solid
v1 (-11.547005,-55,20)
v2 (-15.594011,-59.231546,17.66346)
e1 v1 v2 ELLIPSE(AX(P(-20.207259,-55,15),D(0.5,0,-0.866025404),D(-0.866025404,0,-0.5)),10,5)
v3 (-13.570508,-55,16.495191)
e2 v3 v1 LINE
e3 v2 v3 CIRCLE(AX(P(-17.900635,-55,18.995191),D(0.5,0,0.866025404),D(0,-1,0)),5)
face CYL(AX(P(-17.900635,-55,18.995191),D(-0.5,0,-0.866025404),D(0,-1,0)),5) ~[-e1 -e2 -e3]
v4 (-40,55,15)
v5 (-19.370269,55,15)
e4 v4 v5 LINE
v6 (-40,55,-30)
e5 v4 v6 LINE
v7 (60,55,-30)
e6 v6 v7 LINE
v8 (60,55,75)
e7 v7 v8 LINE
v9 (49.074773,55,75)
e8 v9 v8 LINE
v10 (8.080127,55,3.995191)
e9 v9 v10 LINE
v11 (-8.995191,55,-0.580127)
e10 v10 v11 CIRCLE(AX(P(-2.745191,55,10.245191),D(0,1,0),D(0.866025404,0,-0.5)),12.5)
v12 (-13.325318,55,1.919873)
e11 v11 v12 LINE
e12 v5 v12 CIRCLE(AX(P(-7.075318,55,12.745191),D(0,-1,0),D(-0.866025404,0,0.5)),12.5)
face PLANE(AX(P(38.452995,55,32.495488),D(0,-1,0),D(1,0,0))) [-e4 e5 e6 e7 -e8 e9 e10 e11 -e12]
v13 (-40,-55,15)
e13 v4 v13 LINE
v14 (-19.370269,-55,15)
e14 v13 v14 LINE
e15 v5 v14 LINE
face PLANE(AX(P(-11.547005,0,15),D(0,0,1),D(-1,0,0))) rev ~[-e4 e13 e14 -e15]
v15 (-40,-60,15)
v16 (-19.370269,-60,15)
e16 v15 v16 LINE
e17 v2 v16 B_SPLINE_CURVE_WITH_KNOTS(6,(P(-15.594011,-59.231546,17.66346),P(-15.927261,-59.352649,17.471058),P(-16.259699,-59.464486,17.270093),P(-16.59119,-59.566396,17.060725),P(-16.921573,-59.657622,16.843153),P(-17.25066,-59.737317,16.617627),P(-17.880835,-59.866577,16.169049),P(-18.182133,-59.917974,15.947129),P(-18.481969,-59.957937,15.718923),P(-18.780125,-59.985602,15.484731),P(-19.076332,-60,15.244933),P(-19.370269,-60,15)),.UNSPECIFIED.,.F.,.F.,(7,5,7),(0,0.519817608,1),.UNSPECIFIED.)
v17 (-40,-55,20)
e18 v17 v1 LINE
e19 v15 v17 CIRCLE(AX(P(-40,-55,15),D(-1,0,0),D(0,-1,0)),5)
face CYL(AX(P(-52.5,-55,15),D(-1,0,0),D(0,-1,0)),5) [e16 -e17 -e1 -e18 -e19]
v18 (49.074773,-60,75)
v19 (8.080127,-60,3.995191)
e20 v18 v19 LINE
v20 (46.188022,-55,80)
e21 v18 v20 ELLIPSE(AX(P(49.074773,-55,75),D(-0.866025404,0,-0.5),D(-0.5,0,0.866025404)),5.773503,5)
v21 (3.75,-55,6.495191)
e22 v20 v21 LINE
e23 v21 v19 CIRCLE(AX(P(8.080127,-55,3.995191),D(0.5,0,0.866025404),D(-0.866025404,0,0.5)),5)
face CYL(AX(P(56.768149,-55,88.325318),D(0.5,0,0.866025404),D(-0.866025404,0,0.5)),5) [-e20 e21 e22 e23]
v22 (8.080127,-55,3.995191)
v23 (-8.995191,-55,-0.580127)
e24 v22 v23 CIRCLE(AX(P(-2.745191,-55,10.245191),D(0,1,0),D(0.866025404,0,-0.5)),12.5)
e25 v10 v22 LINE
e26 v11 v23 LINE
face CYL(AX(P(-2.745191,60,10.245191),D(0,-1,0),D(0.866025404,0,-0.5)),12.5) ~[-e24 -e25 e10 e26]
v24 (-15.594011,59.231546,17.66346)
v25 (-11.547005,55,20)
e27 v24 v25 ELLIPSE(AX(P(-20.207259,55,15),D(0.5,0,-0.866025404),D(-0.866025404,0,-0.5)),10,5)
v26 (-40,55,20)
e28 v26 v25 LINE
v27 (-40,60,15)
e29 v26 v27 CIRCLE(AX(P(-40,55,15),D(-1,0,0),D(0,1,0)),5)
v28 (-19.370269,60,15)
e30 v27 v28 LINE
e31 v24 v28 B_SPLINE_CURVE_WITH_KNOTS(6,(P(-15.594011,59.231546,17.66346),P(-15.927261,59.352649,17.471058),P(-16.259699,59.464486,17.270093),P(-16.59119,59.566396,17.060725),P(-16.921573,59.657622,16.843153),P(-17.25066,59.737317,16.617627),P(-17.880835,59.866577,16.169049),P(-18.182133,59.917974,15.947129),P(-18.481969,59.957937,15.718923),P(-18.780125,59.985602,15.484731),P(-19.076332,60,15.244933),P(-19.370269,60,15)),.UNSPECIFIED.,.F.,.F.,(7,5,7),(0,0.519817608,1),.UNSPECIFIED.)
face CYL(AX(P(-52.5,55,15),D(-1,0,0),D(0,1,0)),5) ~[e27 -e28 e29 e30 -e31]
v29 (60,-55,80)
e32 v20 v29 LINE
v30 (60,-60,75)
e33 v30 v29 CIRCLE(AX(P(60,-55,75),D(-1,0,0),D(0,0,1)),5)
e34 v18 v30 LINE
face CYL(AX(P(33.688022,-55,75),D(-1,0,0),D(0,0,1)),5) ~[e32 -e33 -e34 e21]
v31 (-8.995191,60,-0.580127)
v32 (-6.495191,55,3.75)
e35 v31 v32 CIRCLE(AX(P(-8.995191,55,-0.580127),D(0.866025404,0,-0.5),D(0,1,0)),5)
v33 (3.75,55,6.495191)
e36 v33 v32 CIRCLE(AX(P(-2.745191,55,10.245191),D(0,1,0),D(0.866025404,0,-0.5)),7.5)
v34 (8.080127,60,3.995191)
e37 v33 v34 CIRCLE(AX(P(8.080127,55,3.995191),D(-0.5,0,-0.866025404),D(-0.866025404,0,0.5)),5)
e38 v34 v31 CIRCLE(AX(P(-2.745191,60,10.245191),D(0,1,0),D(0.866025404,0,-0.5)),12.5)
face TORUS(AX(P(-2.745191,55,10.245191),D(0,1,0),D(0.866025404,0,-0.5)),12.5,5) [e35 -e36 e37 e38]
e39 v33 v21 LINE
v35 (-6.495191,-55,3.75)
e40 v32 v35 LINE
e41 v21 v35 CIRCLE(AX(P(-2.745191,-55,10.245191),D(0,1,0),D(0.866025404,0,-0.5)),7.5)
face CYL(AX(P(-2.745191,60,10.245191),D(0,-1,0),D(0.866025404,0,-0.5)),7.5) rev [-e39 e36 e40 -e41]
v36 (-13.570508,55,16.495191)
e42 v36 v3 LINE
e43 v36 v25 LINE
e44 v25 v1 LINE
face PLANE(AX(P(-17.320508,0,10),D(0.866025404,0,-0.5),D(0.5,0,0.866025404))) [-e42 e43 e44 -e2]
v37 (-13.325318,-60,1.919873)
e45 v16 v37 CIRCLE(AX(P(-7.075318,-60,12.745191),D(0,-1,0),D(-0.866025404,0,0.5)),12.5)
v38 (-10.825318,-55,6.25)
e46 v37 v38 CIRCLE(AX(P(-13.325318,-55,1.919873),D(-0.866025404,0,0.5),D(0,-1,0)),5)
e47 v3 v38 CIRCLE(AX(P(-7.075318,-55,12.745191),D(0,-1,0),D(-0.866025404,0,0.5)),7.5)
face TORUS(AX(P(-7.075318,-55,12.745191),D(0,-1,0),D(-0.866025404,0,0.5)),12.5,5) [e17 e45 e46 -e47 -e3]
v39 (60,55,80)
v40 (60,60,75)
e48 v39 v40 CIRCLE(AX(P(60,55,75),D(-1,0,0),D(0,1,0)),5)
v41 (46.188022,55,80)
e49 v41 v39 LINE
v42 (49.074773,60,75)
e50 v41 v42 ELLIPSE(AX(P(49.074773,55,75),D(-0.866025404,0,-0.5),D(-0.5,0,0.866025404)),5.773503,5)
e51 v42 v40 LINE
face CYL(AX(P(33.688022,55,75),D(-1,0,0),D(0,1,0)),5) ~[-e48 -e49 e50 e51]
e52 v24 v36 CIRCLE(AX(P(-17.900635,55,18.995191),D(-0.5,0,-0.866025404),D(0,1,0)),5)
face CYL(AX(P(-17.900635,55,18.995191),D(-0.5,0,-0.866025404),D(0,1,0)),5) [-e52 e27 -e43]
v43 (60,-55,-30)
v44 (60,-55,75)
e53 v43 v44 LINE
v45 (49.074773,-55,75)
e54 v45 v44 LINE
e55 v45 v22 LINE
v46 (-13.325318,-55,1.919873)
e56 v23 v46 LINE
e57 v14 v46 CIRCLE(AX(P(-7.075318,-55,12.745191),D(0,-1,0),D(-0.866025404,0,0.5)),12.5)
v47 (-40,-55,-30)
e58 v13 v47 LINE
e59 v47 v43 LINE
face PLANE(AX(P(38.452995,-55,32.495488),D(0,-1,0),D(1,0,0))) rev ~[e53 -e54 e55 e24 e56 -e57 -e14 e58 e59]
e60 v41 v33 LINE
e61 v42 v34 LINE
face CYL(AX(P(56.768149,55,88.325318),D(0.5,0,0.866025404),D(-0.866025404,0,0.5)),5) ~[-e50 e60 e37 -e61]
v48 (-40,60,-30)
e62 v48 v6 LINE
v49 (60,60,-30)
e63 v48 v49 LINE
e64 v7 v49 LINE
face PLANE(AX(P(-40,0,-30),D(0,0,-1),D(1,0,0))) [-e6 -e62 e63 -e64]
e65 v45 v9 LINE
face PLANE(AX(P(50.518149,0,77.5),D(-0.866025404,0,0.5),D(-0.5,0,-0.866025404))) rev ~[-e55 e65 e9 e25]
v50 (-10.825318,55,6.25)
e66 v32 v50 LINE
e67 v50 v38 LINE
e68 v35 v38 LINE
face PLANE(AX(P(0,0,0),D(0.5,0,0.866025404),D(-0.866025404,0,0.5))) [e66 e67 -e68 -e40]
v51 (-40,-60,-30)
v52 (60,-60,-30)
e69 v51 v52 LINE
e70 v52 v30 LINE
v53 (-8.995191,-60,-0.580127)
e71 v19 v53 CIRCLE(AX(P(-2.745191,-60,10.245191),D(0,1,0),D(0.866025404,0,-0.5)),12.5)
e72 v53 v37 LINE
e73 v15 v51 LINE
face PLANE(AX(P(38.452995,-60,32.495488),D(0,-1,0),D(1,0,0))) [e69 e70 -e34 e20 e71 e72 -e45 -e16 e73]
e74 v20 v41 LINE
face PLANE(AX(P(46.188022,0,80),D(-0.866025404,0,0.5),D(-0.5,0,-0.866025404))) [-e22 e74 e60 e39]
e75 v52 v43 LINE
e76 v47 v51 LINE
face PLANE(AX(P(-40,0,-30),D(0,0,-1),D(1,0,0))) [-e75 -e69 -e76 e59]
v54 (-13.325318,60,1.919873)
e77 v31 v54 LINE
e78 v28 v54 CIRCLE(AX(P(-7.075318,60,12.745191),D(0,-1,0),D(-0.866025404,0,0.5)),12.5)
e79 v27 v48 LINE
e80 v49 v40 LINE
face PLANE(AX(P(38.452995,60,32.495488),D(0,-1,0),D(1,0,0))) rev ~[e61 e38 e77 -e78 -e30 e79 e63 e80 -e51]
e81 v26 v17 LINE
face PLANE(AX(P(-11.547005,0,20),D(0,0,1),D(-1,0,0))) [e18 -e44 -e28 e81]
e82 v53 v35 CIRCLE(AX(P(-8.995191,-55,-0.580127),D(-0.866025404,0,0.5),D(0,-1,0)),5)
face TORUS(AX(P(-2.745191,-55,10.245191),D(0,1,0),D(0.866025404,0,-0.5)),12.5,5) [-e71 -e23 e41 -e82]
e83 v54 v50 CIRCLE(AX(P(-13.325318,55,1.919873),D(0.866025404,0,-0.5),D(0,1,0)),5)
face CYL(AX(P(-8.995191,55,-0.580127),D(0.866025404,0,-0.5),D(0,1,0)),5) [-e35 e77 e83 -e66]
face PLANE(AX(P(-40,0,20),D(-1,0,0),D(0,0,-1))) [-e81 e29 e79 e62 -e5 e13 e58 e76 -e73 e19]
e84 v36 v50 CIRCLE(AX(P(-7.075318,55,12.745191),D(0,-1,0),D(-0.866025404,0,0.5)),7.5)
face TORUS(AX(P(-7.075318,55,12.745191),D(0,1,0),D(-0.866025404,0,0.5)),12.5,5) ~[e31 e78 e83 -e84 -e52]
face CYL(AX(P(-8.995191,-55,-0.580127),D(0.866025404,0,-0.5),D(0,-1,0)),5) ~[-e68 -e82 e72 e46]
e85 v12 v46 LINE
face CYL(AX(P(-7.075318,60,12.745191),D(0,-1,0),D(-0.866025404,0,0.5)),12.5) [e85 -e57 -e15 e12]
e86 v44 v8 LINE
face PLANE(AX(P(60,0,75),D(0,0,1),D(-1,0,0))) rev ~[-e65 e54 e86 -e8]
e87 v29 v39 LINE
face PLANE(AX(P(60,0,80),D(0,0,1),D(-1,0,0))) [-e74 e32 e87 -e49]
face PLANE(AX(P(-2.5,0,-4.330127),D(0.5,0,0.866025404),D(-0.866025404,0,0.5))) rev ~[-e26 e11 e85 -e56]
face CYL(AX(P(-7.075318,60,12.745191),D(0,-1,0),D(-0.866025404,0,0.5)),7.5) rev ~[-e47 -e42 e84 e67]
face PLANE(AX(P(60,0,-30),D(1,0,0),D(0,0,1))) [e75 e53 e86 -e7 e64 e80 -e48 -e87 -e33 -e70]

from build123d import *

# Parameters (mm, degrees)
F0_W         = 60
F0_H         = 30
F1_DEPTH     = 60
F2_R         = 7.5
F3_T1_DEPTH  = 38.8119784648
F3_T3_DEPTH  = 97.3760430703
F3_T5_DEPTH  = 5
F3_T7_DEPTH  = 16.5470053838
F3_T9_DEPTH  = 53.4529946162
F3_T12_ANGLE = 90
F3_T14_ANGLE = 90
F3_T16_ANGLE = 90
F3_T18_ANGLE = 90
F4_T         = 5


# Not quite as in the source:
# - a fillet or chamfer that OpenCascade refuses, or shapes differently, is made with other operations: its cross-section is extruded or revolved along the edge and cut away or added
# - a shell that OpenCascade refuses in one call is made with other operations: the cavity is built on its own and cut out


with BuildPart() as f1:
    # F0 (on Front) → F1 (new body, symmetric)
    with BuildSketch(Plane.XZ):
        Polygon((46.1880215352, 80), (0, 0), (60, 0), (60, 80), align=None)
        with Locations((30, -15)):
            Rectangle(F0_W, F0_H)
        Polygon((0, -30), (0, 0), (-17.3205080757, 10), (-11.5470053838, 20), (-40, 20), (-40, -30), align=None)
    extrude(amount=F1_DEPTH, both=True)

    # F2
    f2_edges = [f1.edges().sort_by_distance(p)[0] for p in [
        (-17.320508, 0, 10),
        (0, 0, 0),
    ]]
    fillet(f2_edges, radius=F2_R)

    # F3: fillet of radius 5 on 14 edges, made by hand

    # F3_s2 → F3_t1 (cut)
    with BuildSketch(Plane.YZ.offset(33.6880215352)):
        with BuildLine():
            ThreePointArc((-55, 80), (-58.5355339059, 78.5355339059), (-60, 75))
            Line((-60, 75), (-60, 80))
            Line((-60, 80), (-55, 80))
        make_face()
        with BuildLine():
            ThreePointArc((60, 75), (58.5355339059, 78.5355339059), (55, 80))
            Line((55, 80), (60, 80))
            Line((60, 80), (60, 75))
        make_face()
    extrude(amount=F3_T1_DEPTH, mode=Mode.SUBTRACT)

    # F3_s4 → F3_t3 (cut)
    with BuildSketch(Plane(origin=(52.4380215352, 0, 90.8253175473), x_dir=(0, 1, 0), z_dir=(-0.5, 0, -0.8660254038))):
        with BuildLine():
            ThreePointArc((-55, 0), (-58.5355339059, 1.4644660941), (-60, 5))
            Line((-60, 5), (-60, 0))
            Line((-60, 0), (-55, 0))
        make_face()
        with BuildLine():
            ThreePointArc((55, 0), (58.5355339059, 1.4644660941), (60, 5))
            Line((60, 5), (60, 0))
            Line((60, 0), (55, 0))
        make_face()
    extrude(amount=F3_T3_DEPTH, mode=Mode.SUBTRACT)

    # F3_s6 → F3_t5 (cut)
    with BuildSketch(Plane(origin=(-6.4951905284, 0, 3.75), x_dir=(0, 1, 0), z_dir=(-0.8660254038, 0, 0.5))):
        with BuildLine():
            ThreePointArc((-60, 5), (-58.5355339059, 1.4644660941), (-55, 0))
            Line((-55, 0), (-60, 0))
            Line((-60, 0), (-60, 5))
        make_face()
        with BuildLine():
            ThreePointArc((60, 5), (58.5355339059, 1.4644660941), (55, 0))
            Line((55, 0), (60, 0))
            Line((60, 0), (60, 5))
        make_face()
    extrude(amount=F3_T5_DEPTH, mode=Mode.SUBTRACT)

    # F3_s8 → F3_t7 (cut)
    with BuildSketch(Plane(origin=(3.75, 0, 6.4951905284), x_dir=(0, 1, 0), z_dir=(0.5, 0, 0.8660254038))):
        with BuildLine():
            ThreePointArc((-60, 25), (-58.5355339059, 21.4644660941), (-55, 20))
            Line((-55, 20), (-60, 20))
            Line((-60, 20), (-60, 25))
        make_face()
        with BuildLine():
            ThreePointArc((60, 25), (58.5355339059, 21.4644660941), (55, 20))
            Line((55, 20), (60, 20))
            Line((60, 20), (60, 25))
        make_face()
    extrude(amount=F3_T7_DEPTH, mode=Mode.SUBTRACT)

    # F3_s10 → F3_t9 (cut)
    with BuildSketch(Plane.YZ.offset(-52.5)):
        with BuildLine():
            ThreePointArc((-60, 15), (-58.5355339059, 18.5355339059), (-55, 20))
            Line((-55, 20), (-60, 20))
            Line((-60, 20), (-60, 15))
        make_face()
        with BuildLine():
            ThreePointArc((60, 15), (58.5355339059, 18.5355339059), (55, 20))
            Line((55, 20), (60, 20))
            Line((60, 20), (60, 15))
        make_face()
    extrude(amount=F3_T9_DEPTH, mode=Mode.SUBTRACT)

    # F3_s11 → F3_t12 (revolve, cut)
    with BuildSketch(Plane(origin=(3.75, 0, 6.4951905284), x_dir=(0, 1, 0), z_dir=(0.5, 0, 0.8660254038))):
        with BuildLine():
            ThreePointArc((60, -5), (58.5355339059, -1.4644660941), (55, 0))
            Line((55, 0), (60, 0))
            Line((60, 0), (60, -5))
        make_face()
    revolve(axis=Axis((-2.7451905284, 60, 10.2451905284), (0, 1, 0)), revolution_arc=F3_T12_ANGLE, mode=Mode.SUBTRACT)

    # F3_s13 → F3_t14 (revolve, cut)
    with BuildSketch(Plane(origin=(3.75, 0, 6.4951905284), x_dir=(0, 1, 0), z_dir=(0.5, 0, 0.8660254038))):
        with BuildLine():
            ThreePointArc((60, 25), (58.5355339059, 21.4644660941), (55, 20))
            Line((55, 20), (60, 20))
            Line((60, 20), (60, 25))
        make_face()
    revolve(axis=Axis((-7.0753175473, 60, 12.7451905284), (0, -1, 0)), revolution_arc=F3_T14_ANGLE, mode=Mode.SUBTRACT)

    # F3_s15 → F3_t16 (revolve, cut)
    with BuildSketch(Plane(origin=(3.75, 0, 6.4951905284), x_dir=(0, 1, 0), z_dir=(0.5, 0, 0.8660254038))):
        with BuildLine():
            ThreePointArc((-55, 0), (-58.5355339059, -1.4644660941), (-60, -5))
            Line((-60, -5), (-60, 0))
            Line((-60, 0), (-55, 0))
        make_face()
    revolve(axis=Axis((-2.7451905284, -60, 10.2451905284), (0, 1, 0)), revolution_arc=F3_T16_ANGLE, mode=Mode.SUBTRACT)

    # F3_s17 → F3_t18 (revolve, cut)
    with BuildSketch(Plane(origin=(3.75, 0, 6.4951905284), x_dir=(0, 1, 0), z_dir=(0.5, 0, 0.8660254038))):
        with BuildLine():
            ThreePointArc((-60, 25), (-58.5355339059, 21.4644660941), (-55, 20))
            Line((-55, 20), (-60, 20))
            Line((-60, 20), (-60, 25))
        make_face()
    revolve(axis=Axis((-7.0753175473, -60, 12.7451905284), (0, -1, 0)), revolution_arc=F3_T18_ANGLE, mode=Mode.SUBTRACT)

    # F4: shell of thickness 5, made by hand


with BuildPart() as f4_core1:
    # F4_t2: copy of F1
    add(f1.part)

    # the walls: a layer under each face that stays
    f4_faces = [f4_core1.faces().sort_by_distance(p)[0] for p in [
        (24.9690107676, 0, 43.2475952642),
        (53.0940107676, 0, 80),
        (-0.8040476901, 0, 3.0007468312),
        (-23.3333333333, -60, -12.5),
        (-8.6602540378, 0, 5),
        (-23.3333333333, 60, -12.5),
        (-14.3197612445, 0, 10.8040476901),
        (-25.7735026919, 0, 20),
        (-12.5587567297, 0, 18.2475952642),
    ]]
    thicken(f4_faces, amount=-F4_T, mode=Mode.SUBTRACT)


with BuildPart() as f1_1:
    add(f1.part)

    # what is left inside the walls is the cavity
    f4_cavity = [f4_core1.part.solids().sort_by_distance(p)[0] for p in [
        (59.95, 18.333333, 22.5),
    ]]
    add(f4_cavity, mode=Mode.SUBTRACT)


solid = f1_1.part
